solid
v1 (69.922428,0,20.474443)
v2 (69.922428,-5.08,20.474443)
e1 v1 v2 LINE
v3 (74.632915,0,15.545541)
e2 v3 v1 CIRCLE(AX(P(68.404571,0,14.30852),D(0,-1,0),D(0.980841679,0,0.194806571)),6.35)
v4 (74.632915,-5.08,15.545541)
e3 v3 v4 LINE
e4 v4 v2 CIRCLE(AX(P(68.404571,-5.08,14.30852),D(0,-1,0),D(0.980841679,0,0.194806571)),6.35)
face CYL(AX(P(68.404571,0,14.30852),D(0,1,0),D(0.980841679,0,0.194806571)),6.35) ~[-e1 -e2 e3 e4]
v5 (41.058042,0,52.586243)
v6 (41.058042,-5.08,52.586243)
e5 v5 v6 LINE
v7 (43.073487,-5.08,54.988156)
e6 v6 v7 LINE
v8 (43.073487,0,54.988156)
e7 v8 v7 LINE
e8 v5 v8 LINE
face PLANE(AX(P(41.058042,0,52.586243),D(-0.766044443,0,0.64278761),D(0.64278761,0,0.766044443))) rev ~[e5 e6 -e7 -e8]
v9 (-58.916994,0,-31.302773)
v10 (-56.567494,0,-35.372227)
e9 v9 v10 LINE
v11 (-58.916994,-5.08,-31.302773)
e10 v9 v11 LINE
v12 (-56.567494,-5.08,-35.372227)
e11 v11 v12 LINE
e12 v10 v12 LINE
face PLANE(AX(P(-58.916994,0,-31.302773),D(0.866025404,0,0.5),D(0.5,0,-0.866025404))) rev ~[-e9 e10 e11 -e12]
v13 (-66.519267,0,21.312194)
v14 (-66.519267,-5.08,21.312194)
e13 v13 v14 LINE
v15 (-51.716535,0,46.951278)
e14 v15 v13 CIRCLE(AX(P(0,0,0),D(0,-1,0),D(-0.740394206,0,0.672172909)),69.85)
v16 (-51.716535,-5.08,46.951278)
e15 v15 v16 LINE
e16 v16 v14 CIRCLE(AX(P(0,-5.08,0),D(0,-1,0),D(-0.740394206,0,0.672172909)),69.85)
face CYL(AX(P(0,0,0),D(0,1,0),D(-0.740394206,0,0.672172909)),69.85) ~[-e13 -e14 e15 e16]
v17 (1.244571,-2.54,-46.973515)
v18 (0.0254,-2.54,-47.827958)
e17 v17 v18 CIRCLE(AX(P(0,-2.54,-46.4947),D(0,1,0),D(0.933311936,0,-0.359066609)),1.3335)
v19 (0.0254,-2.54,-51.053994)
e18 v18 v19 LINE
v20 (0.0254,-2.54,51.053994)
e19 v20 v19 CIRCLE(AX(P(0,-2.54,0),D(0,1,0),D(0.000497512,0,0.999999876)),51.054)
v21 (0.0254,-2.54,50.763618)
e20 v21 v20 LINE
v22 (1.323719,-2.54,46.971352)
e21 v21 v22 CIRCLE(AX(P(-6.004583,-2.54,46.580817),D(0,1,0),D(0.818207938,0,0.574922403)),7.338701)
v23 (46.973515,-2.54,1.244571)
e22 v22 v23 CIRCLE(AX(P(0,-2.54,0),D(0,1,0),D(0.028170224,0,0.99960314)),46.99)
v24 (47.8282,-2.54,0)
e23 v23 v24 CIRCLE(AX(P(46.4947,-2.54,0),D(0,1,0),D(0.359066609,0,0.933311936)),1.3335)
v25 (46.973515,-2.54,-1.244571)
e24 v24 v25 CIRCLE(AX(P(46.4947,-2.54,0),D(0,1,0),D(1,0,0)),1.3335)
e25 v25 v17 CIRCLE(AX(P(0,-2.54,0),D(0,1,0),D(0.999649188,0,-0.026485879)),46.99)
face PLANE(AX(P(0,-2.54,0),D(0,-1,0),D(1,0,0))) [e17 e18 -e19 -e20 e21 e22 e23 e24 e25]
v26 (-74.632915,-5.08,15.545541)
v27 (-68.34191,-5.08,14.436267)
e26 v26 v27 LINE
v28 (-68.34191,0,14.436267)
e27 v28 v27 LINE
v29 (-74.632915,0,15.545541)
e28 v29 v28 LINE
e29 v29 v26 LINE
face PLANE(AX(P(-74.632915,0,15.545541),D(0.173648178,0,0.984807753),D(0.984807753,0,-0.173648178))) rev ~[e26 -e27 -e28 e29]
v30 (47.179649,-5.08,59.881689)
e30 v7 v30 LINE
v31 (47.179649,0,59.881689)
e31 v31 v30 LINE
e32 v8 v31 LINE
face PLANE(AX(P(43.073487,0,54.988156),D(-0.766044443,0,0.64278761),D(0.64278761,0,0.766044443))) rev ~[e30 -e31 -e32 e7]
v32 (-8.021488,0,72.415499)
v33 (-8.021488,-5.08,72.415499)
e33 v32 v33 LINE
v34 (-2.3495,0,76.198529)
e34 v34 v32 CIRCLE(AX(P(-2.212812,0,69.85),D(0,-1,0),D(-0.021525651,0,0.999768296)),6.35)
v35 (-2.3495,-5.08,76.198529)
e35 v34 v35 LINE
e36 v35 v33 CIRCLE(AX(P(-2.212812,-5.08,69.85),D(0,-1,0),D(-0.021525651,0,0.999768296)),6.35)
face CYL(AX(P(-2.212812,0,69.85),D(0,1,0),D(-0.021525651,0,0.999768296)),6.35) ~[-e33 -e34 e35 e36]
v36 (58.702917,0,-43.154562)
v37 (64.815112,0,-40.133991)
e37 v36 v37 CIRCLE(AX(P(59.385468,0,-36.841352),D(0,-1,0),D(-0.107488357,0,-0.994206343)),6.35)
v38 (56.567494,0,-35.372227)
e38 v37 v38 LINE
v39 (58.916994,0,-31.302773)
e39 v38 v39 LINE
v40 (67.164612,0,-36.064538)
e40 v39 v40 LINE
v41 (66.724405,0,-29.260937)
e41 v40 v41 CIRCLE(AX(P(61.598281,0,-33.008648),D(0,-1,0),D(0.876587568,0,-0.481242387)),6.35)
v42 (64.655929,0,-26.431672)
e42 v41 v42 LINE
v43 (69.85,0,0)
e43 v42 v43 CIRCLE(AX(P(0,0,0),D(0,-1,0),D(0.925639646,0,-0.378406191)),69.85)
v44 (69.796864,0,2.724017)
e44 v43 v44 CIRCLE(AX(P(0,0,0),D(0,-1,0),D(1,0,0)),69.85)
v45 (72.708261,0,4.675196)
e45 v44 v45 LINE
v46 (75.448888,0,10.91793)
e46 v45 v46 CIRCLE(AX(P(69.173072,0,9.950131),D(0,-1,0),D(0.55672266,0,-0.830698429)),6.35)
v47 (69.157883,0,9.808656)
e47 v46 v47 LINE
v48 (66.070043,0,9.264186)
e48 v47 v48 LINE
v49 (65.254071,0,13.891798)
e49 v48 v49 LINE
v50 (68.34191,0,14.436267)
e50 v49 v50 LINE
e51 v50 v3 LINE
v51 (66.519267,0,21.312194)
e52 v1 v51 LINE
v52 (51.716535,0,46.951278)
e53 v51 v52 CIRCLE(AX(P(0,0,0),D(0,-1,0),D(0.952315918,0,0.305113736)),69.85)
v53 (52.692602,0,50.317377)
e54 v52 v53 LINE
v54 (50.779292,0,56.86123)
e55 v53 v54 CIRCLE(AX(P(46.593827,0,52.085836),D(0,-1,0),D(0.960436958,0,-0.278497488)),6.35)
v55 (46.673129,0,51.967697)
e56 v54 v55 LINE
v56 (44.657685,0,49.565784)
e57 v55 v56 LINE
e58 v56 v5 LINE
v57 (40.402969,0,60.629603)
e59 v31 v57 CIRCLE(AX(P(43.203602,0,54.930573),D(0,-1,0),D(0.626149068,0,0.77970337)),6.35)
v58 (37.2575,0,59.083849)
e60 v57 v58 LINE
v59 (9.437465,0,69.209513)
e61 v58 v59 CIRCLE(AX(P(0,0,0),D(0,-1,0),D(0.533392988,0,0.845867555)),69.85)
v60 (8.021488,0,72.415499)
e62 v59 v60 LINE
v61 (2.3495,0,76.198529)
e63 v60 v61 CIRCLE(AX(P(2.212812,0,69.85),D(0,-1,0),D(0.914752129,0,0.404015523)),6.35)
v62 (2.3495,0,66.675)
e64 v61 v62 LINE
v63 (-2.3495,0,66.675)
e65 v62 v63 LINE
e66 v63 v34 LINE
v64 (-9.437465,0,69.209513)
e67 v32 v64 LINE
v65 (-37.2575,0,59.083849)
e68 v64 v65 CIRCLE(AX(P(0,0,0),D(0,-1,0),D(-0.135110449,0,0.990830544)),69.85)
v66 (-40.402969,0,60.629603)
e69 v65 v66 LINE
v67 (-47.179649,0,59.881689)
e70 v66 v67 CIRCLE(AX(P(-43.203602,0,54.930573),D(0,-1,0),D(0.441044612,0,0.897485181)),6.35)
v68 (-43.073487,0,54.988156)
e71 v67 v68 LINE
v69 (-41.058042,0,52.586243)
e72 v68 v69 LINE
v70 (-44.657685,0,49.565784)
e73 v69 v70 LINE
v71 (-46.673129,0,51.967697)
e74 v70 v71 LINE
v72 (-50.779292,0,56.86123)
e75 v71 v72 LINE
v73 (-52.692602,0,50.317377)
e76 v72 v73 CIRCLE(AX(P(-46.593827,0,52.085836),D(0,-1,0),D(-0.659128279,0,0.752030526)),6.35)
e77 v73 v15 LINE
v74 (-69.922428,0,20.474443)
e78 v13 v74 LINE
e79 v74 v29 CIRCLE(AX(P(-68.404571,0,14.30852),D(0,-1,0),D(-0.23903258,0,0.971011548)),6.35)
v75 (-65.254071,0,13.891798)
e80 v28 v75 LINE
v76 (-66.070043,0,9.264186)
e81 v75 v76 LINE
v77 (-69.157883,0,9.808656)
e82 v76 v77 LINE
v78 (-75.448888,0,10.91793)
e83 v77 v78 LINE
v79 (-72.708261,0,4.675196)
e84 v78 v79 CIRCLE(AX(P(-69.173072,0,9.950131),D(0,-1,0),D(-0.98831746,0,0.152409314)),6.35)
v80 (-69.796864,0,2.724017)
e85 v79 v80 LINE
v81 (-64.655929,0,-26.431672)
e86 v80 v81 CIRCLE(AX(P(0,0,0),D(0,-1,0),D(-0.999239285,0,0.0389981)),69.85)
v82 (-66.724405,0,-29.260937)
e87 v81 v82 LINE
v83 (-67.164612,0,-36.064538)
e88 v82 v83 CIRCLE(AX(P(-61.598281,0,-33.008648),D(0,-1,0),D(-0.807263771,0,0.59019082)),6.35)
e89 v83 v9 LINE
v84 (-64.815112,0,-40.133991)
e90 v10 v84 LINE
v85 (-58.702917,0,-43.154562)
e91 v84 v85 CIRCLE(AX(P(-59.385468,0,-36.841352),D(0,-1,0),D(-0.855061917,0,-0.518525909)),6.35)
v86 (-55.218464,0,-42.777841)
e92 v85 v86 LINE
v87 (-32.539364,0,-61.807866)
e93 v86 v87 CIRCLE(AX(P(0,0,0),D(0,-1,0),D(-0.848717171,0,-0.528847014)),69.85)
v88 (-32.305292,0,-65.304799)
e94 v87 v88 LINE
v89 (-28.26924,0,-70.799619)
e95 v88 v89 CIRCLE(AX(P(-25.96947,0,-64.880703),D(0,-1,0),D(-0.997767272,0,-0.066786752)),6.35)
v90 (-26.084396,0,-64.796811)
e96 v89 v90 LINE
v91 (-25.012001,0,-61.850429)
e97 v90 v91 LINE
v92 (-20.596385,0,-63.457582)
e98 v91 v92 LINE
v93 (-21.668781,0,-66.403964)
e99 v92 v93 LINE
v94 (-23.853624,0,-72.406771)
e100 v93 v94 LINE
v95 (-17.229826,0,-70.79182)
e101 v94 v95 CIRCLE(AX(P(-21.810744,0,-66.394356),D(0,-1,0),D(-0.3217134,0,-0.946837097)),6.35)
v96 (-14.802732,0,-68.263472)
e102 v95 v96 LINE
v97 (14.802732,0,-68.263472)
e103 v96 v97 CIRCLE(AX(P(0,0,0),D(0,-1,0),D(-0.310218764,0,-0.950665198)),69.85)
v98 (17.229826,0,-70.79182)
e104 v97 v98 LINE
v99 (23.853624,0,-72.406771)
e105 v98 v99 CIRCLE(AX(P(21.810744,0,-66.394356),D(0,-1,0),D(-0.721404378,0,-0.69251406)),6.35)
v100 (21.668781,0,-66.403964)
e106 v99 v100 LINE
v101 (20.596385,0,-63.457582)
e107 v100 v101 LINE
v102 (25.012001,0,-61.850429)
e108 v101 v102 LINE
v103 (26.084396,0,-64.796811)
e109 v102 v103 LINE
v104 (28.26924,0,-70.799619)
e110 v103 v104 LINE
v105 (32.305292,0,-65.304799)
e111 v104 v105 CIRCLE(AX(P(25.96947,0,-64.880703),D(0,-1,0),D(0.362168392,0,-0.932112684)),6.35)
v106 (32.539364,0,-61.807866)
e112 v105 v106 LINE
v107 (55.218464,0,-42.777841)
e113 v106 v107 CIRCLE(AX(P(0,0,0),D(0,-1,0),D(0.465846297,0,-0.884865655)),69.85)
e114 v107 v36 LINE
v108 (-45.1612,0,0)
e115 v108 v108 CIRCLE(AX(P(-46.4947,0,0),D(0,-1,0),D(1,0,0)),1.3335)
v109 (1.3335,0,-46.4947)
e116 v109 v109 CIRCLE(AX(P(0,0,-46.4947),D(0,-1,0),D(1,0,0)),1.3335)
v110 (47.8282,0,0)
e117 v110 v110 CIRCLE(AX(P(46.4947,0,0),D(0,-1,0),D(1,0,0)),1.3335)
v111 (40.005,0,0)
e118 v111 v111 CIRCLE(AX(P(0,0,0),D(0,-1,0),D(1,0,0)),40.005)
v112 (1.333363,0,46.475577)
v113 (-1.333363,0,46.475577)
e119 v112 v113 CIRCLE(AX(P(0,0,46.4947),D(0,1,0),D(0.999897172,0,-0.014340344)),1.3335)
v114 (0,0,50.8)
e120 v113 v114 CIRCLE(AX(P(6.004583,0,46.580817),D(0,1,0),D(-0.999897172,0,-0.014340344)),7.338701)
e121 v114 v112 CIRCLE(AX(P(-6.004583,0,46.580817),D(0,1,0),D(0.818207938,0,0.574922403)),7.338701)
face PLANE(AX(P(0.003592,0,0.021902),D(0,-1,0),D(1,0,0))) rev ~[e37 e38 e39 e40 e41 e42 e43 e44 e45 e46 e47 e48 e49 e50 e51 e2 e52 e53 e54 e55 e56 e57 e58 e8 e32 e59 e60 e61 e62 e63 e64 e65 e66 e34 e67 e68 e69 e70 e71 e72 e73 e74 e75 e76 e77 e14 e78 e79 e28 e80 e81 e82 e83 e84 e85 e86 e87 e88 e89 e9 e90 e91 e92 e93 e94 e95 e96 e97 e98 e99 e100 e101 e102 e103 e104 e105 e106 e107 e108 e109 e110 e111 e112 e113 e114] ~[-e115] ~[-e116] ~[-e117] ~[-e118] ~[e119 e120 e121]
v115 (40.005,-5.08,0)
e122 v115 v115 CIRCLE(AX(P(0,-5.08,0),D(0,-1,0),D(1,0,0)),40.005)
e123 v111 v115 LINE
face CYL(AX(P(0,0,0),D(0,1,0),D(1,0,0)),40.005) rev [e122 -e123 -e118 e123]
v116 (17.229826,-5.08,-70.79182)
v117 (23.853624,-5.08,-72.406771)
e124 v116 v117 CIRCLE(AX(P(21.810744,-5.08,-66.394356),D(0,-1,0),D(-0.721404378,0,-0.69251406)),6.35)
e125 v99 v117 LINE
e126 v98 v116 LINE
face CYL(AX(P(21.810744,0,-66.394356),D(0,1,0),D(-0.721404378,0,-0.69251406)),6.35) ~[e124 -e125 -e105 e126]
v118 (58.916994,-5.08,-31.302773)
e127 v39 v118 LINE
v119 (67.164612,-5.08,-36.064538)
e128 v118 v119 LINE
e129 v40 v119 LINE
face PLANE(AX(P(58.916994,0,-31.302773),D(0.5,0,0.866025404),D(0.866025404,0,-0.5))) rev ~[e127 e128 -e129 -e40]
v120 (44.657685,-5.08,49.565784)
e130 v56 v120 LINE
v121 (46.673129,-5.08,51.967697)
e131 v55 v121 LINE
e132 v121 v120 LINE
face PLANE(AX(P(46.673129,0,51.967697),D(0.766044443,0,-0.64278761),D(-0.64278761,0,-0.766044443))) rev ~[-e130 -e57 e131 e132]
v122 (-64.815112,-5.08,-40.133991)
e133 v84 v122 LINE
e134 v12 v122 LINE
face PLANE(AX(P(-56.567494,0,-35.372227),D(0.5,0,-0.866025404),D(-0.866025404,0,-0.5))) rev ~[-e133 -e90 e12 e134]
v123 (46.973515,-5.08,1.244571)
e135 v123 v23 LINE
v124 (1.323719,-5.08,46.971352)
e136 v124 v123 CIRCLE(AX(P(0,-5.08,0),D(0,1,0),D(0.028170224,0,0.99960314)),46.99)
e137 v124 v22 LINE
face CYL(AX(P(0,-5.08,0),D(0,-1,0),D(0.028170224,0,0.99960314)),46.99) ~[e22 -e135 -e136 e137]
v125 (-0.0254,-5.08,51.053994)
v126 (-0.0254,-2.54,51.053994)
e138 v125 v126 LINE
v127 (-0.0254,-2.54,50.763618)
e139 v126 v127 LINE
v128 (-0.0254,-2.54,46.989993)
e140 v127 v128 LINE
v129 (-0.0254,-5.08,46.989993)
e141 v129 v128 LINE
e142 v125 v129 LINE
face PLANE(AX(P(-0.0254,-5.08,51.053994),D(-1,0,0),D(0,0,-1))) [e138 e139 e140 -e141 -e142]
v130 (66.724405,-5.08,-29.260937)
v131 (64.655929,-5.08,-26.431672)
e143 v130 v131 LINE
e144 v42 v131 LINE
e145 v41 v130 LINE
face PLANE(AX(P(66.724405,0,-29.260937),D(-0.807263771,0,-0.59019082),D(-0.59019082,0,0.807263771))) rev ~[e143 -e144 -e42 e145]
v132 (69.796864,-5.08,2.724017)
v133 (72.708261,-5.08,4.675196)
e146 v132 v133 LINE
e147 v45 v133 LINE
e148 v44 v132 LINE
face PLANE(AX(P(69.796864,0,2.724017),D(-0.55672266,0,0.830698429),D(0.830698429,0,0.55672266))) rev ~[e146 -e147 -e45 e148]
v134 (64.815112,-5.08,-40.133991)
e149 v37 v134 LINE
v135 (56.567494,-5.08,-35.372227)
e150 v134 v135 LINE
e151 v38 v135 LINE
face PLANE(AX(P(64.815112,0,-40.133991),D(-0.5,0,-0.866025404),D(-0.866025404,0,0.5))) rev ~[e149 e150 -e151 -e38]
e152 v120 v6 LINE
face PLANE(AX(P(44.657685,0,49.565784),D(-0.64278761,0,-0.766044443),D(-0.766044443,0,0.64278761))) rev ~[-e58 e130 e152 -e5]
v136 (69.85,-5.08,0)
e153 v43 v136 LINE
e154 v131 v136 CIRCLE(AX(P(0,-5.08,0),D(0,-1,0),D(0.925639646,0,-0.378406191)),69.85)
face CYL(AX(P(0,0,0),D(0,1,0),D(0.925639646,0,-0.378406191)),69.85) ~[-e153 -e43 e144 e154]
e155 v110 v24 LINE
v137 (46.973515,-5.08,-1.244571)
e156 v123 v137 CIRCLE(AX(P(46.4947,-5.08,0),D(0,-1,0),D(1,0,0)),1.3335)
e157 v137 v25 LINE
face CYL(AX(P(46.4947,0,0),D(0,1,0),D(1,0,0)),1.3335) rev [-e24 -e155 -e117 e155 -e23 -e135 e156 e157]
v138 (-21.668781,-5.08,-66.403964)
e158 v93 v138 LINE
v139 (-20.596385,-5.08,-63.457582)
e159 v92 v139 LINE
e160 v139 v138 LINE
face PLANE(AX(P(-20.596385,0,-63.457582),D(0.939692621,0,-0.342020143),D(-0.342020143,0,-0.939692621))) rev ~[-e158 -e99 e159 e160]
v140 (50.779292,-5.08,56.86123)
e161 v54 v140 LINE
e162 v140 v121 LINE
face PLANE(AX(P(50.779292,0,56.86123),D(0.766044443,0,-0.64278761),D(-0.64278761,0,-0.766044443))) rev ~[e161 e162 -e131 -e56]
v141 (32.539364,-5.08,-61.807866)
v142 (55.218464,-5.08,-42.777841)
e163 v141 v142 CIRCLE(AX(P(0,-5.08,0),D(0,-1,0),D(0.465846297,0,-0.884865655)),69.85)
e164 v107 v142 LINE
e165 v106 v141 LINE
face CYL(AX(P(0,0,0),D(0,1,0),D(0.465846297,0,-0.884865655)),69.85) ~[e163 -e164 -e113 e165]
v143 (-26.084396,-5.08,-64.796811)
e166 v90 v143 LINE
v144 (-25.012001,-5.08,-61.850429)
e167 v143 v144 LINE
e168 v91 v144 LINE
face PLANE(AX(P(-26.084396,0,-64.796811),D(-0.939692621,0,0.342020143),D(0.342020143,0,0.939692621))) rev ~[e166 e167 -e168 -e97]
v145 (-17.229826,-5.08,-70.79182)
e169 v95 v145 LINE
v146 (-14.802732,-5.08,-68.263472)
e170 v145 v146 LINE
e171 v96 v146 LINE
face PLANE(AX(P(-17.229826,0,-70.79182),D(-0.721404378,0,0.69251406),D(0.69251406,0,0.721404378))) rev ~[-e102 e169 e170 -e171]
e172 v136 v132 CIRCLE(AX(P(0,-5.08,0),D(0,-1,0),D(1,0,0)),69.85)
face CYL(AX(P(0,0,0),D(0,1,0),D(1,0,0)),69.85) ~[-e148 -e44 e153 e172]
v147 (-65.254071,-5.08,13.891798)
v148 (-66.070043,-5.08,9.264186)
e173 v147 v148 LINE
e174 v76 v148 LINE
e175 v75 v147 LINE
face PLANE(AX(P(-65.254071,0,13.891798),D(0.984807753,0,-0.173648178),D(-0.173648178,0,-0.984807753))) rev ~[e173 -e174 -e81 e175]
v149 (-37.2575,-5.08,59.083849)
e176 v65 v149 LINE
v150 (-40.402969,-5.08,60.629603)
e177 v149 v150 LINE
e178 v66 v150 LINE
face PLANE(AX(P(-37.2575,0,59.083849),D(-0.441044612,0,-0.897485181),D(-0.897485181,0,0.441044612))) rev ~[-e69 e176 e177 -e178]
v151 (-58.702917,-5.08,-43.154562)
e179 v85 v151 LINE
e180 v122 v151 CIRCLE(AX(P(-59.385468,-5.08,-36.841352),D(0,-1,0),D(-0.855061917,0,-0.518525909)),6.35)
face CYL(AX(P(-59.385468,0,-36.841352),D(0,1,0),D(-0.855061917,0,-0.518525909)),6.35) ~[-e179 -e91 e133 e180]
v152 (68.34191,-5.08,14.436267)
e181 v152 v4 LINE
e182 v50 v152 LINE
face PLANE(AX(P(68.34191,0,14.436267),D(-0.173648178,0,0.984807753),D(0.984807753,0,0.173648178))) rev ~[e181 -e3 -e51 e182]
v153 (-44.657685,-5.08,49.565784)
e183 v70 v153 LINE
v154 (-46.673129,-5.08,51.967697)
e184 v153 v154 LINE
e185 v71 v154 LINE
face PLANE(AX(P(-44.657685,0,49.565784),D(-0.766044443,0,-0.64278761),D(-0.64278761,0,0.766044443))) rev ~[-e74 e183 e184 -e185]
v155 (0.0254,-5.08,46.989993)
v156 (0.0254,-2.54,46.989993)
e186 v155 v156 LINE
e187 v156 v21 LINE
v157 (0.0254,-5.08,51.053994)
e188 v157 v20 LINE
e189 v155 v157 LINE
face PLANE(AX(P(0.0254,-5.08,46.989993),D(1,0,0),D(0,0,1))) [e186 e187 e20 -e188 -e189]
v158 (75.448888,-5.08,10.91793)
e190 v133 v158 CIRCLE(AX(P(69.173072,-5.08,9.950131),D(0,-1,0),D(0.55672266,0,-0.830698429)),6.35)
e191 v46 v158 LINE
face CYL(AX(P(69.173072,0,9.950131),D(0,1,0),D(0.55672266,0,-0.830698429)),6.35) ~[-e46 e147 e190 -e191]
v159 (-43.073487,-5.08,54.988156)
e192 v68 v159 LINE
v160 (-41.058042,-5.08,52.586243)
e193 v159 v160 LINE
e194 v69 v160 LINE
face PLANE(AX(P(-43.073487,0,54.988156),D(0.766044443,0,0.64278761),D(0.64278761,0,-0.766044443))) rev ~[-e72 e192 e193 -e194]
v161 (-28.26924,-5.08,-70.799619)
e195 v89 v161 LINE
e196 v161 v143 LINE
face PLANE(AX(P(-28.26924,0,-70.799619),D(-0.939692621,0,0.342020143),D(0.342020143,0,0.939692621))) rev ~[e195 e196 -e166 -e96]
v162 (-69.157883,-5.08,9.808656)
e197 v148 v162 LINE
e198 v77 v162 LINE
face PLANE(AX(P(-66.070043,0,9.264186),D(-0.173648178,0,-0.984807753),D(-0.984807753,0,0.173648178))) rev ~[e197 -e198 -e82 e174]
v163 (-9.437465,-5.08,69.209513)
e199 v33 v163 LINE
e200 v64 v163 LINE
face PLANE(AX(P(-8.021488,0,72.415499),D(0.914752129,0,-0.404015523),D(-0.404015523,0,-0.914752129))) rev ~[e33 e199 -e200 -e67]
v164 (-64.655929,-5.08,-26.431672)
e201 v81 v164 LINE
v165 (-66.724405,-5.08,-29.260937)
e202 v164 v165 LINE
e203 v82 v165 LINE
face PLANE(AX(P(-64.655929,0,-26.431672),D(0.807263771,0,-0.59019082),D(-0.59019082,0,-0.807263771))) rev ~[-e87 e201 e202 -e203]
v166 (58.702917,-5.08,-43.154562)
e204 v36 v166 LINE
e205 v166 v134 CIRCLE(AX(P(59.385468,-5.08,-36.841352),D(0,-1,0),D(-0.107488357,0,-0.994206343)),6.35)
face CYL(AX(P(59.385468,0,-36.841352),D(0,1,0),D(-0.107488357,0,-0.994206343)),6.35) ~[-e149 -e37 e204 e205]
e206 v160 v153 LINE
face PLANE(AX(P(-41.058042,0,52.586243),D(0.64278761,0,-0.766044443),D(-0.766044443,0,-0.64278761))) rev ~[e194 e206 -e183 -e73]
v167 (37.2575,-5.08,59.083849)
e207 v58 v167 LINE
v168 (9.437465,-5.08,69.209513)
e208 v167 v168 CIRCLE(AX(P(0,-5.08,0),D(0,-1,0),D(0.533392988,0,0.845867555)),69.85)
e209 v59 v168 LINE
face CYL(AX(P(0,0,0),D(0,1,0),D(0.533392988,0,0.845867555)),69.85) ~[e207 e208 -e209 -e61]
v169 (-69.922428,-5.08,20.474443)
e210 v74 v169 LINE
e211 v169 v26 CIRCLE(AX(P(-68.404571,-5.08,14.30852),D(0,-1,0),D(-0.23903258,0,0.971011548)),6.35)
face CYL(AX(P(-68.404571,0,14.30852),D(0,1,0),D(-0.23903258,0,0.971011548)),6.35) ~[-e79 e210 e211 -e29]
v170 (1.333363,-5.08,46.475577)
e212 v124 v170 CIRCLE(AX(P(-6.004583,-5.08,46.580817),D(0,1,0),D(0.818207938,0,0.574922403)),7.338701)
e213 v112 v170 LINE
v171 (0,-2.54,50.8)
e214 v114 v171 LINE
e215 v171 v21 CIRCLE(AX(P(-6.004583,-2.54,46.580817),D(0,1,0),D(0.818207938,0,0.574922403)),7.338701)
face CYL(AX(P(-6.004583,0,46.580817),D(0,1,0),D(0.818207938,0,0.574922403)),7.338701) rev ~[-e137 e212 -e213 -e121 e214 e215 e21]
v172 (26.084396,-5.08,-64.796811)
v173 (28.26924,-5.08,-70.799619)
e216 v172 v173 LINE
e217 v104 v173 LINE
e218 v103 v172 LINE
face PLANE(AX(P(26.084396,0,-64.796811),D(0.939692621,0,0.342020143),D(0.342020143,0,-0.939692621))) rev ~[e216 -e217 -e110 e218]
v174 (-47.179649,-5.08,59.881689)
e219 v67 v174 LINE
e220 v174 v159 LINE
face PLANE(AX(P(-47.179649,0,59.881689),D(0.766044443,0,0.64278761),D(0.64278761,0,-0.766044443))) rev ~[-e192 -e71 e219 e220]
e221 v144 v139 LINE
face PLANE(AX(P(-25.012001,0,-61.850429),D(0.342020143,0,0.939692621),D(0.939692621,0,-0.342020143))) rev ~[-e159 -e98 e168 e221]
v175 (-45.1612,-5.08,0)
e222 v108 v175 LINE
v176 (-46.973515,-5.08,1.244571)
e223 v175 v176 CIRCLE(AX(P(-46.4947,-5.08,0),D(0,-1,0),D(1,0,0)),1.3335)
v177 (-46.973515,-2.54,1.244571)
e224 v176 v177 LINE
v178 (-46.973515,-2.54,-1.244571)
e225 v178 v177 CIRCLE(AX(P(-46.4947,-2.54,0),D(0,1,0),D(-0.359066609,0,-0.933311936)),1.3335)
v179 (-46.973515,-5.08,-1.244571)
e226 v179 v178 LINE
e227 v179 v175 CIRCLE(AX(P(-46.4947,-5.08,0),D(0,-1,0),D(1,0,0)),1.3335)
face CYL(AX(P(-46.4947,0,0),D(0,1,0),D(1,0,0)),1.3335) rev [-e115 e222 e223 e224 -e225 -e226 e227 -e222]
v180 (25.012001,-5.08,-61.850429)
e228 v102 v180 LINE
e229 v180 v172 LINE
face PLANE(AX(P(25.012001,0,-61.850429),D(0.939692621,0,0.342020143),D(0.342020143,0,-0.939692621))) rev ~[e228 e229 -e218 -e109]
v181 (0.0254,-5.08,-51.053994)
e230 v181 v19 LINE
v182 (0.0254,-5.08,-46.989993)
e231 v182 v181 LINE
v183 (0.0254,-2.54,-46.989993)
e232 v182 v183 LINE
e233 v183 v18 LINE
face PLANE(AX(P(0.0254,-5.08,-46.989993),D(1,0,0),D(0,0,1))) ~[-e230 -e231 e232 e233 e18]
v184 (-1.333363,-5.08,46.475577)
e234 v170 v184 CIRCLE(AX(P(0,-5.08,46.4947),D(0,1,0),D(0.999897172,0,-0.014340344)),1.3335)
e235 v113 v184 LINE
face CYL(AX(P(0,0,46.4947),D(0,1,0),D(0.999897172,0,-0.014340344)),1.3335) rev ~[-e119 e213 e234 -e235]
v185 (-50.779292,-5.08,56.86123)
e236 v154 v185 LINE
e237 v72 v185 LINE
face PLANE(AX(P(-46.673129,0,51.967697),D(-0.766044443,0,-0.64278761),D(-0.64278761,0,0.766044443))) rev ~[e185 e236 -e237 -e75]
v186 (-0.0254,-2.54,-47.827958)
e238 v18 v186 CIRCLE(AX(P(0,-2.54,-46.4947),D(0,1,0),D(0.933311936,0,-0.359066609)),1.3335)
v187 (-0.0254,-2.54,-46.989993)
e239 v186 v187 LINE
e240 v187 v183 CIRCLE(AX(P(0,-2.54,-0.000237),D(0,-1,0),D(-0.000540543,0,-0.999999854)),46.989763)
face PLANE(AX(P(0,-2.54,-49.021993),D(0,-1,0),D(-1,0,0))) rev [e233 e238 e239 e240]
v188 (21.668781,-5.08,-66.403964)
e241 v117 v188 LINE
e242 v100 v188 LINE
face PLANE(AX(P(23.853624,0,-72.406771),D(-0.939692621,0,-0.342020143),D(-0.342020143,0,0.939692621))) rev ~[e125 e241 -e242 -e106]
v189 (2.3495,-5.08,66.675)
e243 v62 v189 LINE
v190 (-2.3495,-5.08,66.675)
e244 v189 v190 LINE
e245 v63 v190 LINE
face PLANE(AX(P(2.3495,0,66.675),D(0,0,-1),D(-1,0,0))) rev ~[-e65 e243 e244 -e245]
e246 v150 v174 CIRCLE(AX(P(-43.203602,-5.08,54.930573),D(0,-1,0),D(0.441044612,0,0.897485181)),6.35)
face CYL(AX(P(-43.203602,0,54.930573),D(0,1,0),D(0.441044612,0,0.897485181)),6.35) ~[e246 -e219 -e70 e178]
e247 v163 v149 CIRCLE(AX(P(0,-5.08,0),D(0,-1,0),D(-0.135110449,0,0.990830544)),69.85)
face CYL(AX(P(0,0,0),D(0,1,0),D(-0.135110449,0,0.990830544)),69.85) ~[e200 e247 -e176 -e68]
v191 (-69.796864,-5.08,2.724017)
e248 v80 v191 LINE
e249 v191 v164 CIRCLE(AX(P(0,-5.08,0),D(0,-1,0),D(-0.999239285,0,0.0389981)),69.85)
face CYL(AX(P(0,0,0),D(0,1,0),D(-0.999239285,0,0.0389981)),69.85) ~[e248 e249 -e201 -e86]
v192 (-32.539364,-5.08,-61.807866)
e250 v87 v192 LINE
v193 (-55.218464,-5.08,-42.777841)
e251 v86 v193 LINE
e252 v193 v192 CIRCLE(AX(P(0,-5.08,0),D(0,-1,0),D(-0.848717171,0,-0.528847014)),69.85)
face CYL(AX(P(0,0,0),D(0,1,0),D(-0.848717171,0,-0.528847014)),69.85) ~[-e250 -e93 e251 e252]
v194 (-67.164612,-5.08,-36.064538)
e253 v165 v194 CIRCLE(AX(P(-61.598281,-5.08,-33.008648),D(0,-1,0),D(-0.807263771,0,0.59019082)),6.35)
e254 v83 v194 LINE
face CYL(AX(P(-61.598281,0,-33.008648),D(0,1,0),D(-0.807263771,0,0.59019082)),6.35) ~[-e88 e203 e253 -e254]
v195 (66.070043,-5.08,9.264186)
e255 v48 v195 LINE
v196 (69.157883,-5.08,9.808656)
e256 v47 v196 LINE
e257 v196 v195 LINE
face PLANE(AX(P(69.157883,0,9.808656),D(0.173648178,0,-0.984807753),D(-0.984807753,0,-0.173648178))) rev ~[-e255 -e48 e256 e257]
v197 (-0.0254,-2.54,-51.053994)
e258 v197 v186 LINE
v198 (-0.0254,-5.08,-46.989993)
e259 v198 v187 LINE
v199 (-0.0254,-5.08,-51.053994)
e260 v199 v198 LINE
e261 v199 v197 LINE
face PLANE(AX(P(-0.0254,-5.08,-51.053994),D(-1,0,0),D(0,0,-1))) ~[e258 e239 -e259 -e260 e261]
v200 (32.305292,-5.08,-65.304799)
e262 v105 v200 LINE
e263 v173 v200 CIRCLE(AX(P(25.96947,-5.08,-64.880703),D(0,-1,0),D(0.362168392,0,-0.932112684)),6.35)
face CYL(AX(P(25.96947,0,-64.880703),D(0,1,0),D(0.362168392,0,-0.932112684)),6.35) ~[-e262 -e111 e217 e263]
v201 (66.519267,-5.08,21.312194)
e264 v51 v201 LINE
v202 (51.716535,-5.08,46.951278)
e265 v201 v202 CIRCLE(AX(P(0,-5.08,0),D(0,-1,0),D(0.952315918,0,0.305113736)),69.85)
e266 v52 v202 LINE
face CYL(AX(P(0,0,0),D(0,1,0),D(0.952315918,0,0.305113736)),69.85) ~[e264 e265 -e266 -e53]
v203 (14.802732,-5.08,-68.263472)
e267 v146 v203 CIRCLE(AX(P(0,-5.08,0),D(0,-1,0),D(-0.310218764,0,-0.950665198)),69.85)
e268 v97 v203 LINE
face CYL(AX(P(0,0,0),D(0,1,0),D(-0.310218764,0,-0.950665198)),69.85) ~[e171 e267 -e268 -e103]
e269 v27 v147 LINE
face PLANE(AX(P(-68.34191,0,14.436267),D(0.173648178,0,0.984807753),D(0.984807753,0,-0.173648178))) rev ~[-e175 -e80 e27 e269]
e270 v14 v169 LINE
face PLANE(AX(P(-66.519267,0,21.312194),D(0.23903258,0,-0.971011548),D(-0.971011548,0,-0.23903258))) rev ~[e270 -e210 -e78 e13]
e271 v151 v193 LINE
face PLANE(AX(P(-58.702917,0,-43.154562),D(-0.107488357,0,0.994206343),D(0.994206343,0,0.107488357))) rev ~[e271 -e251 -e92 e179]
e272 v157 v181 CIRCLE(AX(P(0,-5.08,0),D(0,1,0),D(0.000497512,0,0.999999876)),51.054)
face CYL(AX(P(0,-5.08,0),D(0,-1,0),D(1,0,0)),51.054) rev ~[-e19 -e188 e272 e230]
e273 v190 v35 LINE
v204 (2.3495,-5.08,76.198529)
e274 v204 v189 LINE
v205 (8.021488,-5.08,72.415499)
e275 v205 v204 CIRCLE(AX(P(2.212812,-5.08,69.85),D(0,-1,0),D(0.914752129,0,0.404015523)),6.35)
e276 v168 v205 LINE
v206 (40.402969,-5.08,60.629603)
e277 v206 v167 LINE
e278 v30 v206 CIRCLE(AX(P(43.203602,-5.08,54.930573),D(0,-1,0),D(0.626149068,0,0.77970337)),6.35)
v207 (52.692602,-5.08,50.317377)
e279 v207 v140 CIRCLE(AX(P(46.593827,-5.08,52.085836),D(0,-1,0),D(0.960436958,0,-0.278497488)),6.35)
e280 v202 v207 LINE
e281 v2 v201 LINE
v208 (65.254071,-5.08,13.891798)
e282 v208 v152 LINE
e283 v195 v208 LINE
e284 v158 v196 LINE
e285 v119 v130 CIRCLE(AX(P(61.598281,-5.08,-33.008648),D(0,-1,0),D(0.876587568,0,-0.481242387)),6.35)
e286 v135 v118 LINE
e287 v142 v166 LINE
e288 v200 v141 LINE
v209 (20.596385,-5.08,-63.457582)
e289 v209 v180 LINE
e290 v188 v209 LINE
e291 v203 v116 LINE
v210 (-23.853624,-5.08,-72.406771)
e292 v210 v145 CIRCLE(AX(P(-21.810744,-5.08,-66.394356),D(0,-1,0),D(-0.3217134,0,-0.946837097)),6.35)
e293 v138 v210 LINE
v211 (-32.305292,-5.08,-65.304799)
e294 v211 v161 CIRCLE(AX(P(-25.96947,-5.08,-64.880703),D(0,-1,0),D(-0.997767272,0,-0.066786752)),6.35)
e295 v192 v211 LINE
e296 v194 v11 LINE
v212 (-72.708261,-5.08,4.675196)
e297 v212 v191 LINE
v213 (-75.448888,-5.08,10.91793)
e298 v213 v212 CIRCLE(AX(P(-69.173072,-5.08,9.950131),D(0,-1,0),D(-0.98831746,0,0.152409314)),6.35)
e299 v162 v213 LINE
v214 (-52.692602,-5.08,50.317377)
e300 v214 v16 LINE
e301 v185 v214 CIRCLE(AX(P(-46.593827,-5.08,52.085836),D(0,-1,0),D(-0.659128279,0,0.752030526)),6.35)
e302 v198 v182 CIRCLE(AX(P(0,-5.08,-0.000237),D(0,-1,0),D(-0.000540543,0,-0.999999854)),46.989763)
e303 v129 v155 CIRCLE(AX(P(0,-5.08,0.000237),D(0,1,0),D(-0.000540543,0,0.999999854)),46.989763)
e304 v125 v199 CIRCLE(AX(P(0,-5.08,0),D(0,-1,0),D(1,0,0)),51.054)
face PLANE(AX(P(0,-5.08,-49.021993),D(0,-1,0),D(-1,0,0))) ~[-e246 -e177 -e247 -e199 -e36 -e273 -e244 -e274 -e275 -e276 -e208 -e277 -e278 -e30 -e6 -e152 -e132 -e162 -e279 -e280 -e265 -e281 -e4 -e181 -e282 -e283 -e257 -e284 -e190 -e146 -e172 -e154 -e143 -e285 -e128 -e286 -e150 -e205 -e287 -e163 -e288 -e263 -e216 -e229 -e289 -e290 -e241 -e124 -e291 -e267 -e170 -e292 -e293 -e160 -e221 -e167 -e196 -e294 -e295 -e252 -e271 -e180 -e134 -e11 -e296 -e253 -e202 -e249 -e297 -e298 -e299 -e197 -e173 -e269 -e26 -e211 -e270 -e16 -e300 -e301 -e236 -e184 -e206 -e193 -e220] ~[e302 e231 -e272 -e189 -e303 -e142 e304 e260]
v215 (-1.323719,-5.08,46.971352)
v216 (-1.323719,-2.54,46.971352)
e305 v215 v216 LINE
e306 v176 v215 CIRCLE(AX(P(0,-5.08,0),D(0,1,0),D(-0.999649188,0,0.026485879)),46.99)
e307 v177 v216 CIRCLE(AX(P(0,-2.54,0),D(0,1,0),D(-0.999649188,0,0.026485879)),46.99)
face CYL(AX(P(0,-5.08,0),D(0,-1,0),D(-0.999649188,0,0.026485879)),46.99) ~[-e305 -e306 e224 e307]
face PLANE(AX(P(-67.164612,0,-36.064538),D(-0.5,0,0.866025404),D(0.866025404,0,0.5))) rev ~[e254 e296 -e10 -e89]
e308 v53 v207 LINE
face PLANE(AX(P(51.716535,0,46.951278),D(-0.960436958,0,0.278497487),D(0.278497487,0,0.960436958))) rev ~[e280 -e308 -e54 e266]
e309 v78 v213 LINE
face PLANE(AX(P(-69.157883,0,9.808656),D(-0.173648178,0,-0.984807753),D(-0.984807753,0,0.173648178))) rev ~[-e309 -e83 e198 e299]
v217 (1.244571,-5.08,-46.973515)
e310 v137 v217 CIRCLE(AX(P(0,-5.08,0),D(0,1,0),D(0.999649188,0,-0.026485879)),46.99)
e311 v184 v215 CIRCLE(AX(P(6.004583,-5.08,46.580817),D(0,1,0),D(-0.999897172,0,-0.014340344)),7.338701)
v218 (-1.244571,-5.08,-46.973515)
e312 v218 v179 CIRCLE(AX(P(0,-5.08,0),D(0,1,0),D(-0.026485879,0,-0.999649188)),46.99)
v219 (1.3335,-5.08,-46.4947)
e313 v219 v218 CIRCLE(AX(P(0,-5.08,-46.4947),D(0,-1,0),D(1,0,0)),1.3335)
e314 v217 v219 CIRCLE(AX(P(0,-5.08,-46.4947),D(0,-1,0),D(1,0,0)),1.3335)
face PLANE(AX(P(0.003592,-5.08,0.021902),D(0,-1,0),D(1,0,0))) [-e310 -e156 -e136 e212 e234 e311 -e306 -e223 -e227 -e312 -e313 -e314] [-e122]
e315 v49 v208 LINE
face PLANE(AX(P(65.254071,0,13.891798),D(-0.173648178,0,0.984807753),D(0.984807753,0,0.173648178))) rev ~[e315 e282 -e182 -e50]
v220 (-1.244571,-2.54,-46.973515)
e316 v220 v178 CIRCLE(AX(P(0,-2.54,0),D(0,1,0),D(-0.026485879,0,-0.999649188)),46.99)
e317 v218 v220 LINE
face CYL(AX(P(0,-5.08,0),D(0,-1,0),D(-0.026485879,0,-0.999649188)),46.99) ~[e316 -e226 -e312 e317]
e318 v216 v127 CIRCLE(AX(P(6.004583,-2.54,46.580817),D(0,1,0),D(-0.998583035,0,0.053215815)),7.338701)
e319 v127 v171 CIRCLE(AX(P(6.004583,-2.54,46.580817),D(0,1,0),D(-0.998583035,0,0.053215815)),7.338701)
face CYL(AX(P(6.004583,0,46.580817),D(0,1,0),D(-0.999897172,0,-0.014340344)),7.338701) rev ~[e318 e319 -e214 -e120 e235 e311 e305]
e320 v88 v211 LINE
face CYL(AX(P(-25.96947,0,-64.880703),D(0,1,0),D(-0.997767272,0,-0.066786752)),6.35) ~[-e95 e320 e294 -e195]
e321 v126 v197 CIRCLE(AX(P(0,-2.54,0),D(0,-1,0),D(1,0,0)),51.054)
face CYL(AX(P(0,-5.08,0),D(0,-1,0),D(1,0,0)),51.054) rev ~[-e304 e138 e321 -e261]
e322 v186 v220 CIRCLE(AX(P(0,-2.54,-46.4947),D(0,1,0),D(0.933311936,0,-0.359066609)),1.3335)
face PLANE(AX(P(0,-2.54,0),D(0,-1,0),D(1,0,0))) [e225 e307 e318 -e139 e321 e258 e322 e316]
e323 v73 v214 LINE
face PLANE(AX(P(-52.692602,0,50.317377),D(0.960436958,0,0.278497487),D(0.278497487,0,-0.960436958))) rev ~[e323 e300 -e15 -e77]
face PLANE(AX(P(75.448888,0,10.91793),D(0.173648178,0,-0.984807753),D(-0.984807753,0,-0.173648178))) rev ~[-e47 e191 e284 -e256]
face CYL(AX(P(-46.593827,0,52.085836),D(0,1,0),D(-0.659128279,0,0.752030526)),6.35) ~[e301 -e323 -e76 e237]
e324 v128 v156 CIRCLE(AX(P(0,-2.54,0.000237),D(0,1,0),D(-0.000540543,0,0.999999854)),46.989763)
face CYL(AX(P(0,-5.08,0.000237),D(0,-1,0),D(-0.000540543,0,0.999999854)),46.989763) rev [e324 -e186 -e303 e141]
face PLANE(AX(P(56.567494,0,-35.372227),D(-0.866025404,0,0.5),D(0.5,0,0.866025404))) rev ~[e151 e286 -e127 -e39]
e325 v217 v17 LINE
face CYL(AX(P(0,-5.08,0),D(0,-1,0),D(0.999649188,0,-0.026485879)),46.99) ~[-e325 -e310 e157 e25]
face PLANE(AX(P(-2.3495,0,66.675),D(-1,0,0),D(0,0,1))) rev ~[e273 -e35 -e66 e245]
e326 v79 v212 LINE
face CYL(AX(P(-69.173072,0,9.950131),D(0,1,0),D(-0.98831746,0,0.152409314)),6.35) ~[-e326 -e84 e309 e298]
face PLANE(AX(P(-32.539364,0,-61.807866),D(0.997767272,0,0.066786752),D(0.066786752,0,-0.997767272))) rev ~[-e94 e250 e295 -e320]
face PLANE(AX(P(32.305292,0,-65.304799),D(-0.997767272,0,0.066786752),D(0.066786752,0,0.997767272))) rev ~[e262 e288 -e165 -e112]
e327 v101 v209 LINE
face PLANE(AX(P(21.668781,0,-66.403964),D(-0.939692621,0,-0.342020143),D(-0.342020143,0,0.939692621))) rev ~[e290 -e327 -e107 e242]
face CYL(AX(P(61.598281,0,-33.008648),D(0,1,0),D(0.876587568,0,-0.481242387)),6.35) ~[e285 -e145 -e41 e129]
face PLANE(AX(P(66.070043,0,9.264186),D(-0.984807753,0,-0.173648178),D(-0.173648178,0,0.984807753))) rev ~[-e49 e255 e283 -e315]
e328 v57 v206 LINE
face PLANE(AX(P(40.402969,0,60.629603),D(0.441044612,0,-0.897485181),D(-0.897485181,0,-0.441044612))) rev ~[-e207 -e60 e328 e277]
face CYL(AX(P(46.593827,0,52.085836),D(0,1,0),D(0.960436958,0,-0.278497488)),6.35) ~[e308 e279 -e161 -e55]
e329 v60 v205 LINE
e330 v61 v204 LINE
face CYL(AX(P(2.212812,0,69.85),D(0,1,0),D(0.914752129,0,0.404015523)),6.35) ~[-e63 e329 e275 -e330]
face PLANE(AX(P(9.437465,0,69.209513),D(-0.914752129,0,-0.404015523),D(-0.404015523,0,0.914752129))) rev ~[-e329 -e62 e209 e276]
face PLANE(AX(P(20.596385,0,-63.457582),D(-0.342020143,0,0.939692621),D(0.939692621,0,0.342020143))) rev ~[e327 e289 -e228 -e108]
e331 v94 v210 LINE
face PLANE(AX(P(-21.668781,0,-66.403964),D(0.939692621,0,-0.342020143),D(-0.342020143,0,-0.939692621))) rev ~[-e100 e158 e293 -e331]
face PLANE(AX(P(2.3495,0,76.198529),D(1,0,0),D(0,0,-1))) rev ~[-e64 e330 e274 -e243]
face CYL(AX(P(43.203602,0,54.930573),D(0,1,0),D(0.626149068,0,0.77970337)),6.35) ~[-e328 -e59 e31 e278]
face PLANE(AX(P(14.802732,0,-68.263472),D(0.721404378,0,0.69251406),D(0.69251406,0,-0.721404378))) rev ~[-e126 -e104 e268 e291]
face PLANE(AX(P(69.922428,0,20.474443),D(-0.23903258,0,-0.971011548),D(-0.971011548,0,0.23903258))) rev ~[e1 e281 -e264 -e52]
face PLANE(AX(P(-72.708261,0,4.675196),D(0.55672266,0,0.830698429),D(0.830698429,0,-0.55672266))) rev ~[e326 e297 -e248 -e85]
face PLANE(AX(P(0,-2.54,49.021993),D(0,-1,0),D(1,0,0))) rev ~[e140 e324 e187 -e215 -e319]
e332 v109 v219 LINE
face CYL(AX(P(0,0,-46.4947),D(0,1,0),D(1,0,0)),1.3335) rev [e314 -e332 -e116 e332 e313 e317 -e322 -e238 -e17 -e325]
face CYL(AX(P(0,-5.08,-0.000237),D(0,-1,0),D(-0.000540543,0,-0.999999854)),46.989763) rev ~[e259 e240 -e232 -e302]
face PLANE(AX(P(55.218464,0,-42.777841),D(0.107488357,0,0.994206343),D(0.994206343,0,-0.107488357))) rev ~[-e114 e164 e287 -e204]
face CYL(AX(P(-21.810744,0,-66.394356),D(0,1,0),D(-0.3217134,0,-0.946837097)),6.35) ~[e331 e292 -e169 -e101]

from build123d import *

# Parameters (mm, degrees)
F0_R     = 1.3335
F0_R_2   = 40.005
F1_DEPTH = 5.08
F2_R     = 51.054
F3_DEPTH = 2.54
F5_DEPTH = 2.54


# Not quite as in the source:
# - a pattern or mirror of a feature is missing from the dataset's text; its kind, count and spacing are read off the source's solid


with BuildPart() as f1:
    # F0 (on Front) → F1 (new body)
    with BuildSketch(Plane.XZ):
        with BuildLine():
            ThreePointArc((64.6559292996, -26.4316724103), (68.5391828138, -13.4685900974), (69.85, 0))
            ThreePointArc((69.85, 0), (69.8367147463, 1.3622677557), (69.796864039, 2.7240173131))
            ThreePointArc((69.796864039, 2.7240173131), (69.5676178372, 6.2744759504), (69.1578829213, 9.8086558631))
            Line((69.1578829213, 9.8086558631), (66.0700433255, 9.2641864302))
            Line((66.0700433255, 9.2641864302), (65.2540705387, 13.8917980616))
            Line((65.2540705387, 13.8917980616), (68.3419101345, 14.4362674945))
            ThreePointArc((68.3419101345, 14.4362674945), (67.5181742912, 17.8974478736), (66.5192668833, 21.3121944743))
            ThreePointArc((66.5192668833, 21.3121944743), (60.4918744543, 34.925), (51.7165352668, 46.9512777249))
            ThreePointArc((51.7165352668, 46.9512777249), (49.258731667, 49.5237302165), (46.6731294533, 51.9676965724))
            Line((46.6731294533, 51.9676965724), (44.657685295, 49.565783756))
            Line((44.657685295, 49.565783756), (41.0580424567, 52.5862427339))
            Line((41.0580424567, 52.5862427339), (43.0734866151, 54.9881555503))
            ThreePointArc((43.0734866151, 54.9881555503), (40.2176644871, 57.1100863526), (37.257500213, 59.0838487057))
            ThreePointArc((37.257500213, 59.0838487057), (23.8901070113, 65.6375295619), (9.4374648779, 69.2095134839))
            ThreePointArc((9.4374648779, 69.2095134839), (5.9011375, 69.6002807193), (2.3495, 69.8104744988))
            Line((2.3495, 69.8104744988), (2.3495, 66.675))
            Line((2.3495, 66.675), (-2.3495, 66.675))
            Line((-2.3495, 66.675), (-2.3495, 69.8104744988))
            ThreePointArc((-2.3495, 69.8104744988), (-5.9011375, 69.6002807193), (-9.4374648779, 69.2095134839))
            ThreePointArc((-9.4374648779, 69.2095134839), (-23.8901070113, 65.6375295619), (-37.257500213, 59.0838487057))
            ThreePointArc((-37.257500213, 59.0838487057), (-40.2176644871, 57.1100863526), (-43.0734866151, 54.9881555503))
            Line((-43.0734866151, 54.9881555503), (-41.0580424567, 52.5862427339))
            Line((-41.0580424567, 52.5862427339), (-44.657685295, 49.565783756))
            Line((-44.657685295, 49.565783756), (-46.6731294533, 51.9676965724))
            ThreePointArc((-46.6731294533, 51.9676965724), (-49.258731667, 49.5237302165), (-51.7165352668, 46.9512777249))
            ThreePointArc((-51.7165352668, 46.9512777249), (-60.4918744543, 34.925), (-66.5192668833, 21.3121944743))
            ThreePointArc((-66.5192668833, 21.3121944743), (-67.5181742912, 17.8974478736), (-68.3419101345, 14.4362674945))
            Line((-68.3419101345, 14.4362674945), (-65.2540705387, 13.8917980616))
            Line((-65.2540705387, 13.8917980616), (-66.0700433255, 9.2641864302))
            Line((-66.0700433255, 9.2641864302), (-69.1578829213, 9.8086558631))
            ThreePointArc((-69.1578829213, 9.8086558631), (-69.5676178372, 6.2744759504), (-69.796864039, 2.7240173131))
            ThreePointArc((-69.796864039, 2.7240173131), (-68.7888215479, -12.12932521), (-64.6559292996, -26.4316724103))
            ThreePointArc((-64.6559292996, -26.4316724103), (-63.2261799634, -29.6896053734), (-61.6323943662, -32.8705105632))
            Line((-61.6323943662, -32.8705105632), (-58.9169937973, -31.3027733138))
            Line((-58.9169937973, -31.3027733138), (-56.5674937973, -35.3722266862))
            Line((-56.5674937973, -35.3722266862), (-59.2828943662, -36.9399639356))
            ThreePointArc((-59.2828943662, -36.9399639356), (-57.3250424634, -39.9106753459), (-55.2184644216, -42.7778410736))
            ThreePointArc((-55.2184644216, -42.7778410736), (-44.8987145366, -53.5082043519), (-32.539363826, -61.8078660188))
            ThreePointArc((-32.539363826, -61.8078660188), (-29.3499533501, -63.384562303), (-26.0843963063, -64.7968114134))
            Line((-26.0843963063, -64.7968114134), (-25.0120008688, -61.8504291642))
            Line((-25.0120008688, -61.8504291642), (-20.5963852437, -63.4575818176))
            Line((-20.5963852437, -63.4575818176), (-21.6687806812, -66.4039640668))
            ThreePointArc((-21.6687806812, -66.4039640668), (-18.2594426241, -67.4211780901), (-14.8027316165, -68.2634721992))
            ThreePointArc((-14.8027316165, -68.2634721992), (0, -69.85), (14.8027316165, -68.2634721992))
            ThreePointArc((14.8027316165, -68.2634721992), (18.2594426241, -67.4211780901), (21.6687806812, -66.4039640668))
            Line((21.6687806812, -66.4039640668), (20.5963852437, -63.4575818176))
            Line((20.5963852437, -63.4575818176), (25.0120008688, -61.8504291642))
            Line((25.0120008688, -61.8504291642), (26.0843963063, -64.7968114134))
            ThreePointArc((26.0843963063, -64.7968114134), (29.3499533501, -63.384562303), (32.539363826, -61.8078660188))
            ThreePointArc((32.539363826, -61.8078660188), (44.8987145366, -53.5082043519), (55.2184644216, -42.7778410736))
            ThreePointArc((55.2184644216, -42.7778410736), (57.3250424634, -39.9106753459), (59.2828943662, -36.9399639356))
            Line((59.2828943662, -36.9399639356), (56.5674937973, -35.3722266862))
            Line((56.5674937973, -35.3722266862), (58.9169937973, -31.3027733138))
            Line((58.9169937973, -31.3027733138), (61.6323943662, -32.8705105632))
            ThreePointArc((61.6323943662, -32.8705105632), (63.2261799634, -29.6896053734), (64.6559292996, -26.4316724103))
        make_face()
        with Locations((-46.4947, 0)):
            Circle(F0_R, mode=Mode.SUBTRACT)
        with Locations((0, -46.4947)):
            Circle(F0_R, mode=Mode.SUBTRACT)
        Circle(F0_R_2, mode=Mode.SUBTRACT)
        with Locations((46.4947, 0)):
            Circle(F0_R, mode=Mode.SUBTRACT)
        with BuildLine():
            ThreePointArc((1.3333628788, 46.4755771511), (0, 45.1612), (-1.3333628788, 46.4755771511))
            ThreePointArc((-1.3333628788, 46.4755771511), (-1.0083284803, 48.7431296807), (0, 50.8))
            ThreePointArc((0, 50.8), (1.0083284803, 48.7431296807), (1.3333628788, 46.4755771511))
        make_face(mode=Mode.SUBTRACT)
        with BuildLine():
            ThreePointArc((-43.0734866151, 54.9881555503), (-40.2176644871, 57.1100863526), (-37.257500213, 59.0838487057))
            Line((-37.257500213, 59.0838487057), (-40.4029688253, 60.6296034594))
            ThreePointArc((-40.4029688253, 60.6296034594), (-43.9001960603, 61.242248794), (-47.1796486938, 59.8816889594))
            Line((-47.1796486938, 59.8816889594), (-43.0734866151, 54.9881555503))
        make_face()
        with BuildLine():
            ThreePointArc((-51.7165352668, 46.9512777249), (-49.258731667, 49.5237302165), (-46.6731294533, 51.9676965724))
            Line((-46.6731294533, 51.9676965724), (-50.779291532, 56.8612299815))
            ThreePointArc((-50.779291532, 56.8612299815), (-52.6886523792, 53.8678583382), (-52.69260164, 50.3173770972))
            Line((-52.69260164, 50.3173770972), (-51.7165352668, 46.9512777249))
        make_face()
        with BuildLine():
            ThreePointArc((-9.4374648779, 69.2095134839), (-5.9011375, 69.6002807193), (-2.3495, 69.8104744988))
            Line((-2.3495, 69.8104744988), (-2.3495, 76.1985286816))
            ThreePointArc((-2.3495, 76.1985286816), (-5.7362574703, 75.1327864631), (-8.0214881298, 72.415498574))
            Line((-8.0214881298, 72.415498574), (-9.4374648779, 69.2095134839))
        make_face()
        with BuildLine():
            ThreePointArc((2.3495, 69.8104744988), (5.9011375, 69.6002807193), (9.4374648779, 69.2095134839))
            Line((9.4374648779, 69.2095134839), (8.0214881298, 72.415498574))
            ThreePointArc((8.0214881298, 72.415498574), (5.7362574703, 75.1327864631), (2.3495, 76.1985286816))
            Line((2.3495, 76.1985286816), (2.3495, 69.8104744988))
        make_face()
        with BuildLine():
            ThreePointArc((37.257500213, 59.0838487057), (40.2176644871, 57.1100863526), (43.0734866151, 54.9881555503))
            Line((43.0734866151, 54.9881555503), (47.1796486938, 59.8816889594))
            ThreePointArc((47.1796486938, 59.8816889594), (43.9001960603, 61.242248794), (40.4029688253, 60.6296034594))
            Line((40.4029688253, 60.6296034594), (37.257500213, 59.0838487057))
        make_face()
        with BuildLine():
            ThreePointArc((46.6731294533, 51.9676965724), (49.258731667, 49.5237302165), (51.7165352668, 46.9512777249))
            Line((51.7165352668, 46.9512777249), (52.69260164, 50.3173770972))
            ThreePointArc((52.69260164, 50.3173770972), (52.6886523792, 53.8678583382), (50.779291532, 56.8612299815))
            Line((50.779291532, 56.8612299815), (46.6731294533, 51.9676965724))
        make_face()
        with BuildLine():
            ThreePointArc((66.5192668833, 21.3121944743), (67.5181742912, 17.8974478736), (68.3419101345, 14.4362674945))
            Line((68.3419101345, 14.4362674945), (74.6329154204, 15.5455414622))
            ThreePointArc((74.6329154204, 15.5455414622), (72.9952599579, 18.6957822824), (69.922427638, 20.4744430631))
            Line((69.922427638, 20.4744430631), (66.5192668833, 21.3121944743))
        make_face()
        with BuildLine():
            ThreePointArc((69.1578829213, 9.8086558631), (69.5676178372, 6.2744759504), (69.796864039, 2.7240173131))
            Line((69.796864039, 2.7240173131), (72.7082612299, 4.6751956613))
            ThreePointArc((72.7082612299, 4.6751956613), (74.9874412706, 7.3975606223), (75.4488882072, 10.9179298308))
            Line((75.4488882072, 10.9179298308), (69.1578829213, 9.8086558631))
        make_face()
        with BuildLine():
            Line((66.7244054577, -29.2609367904), (64.6559292996, -26.4316724103))
            ThreePointArc((64.6559292996, -26.4316724103), (63.2261799634, -29.6896053734), (61.6323943662, -32.8705105632))
            Line((61.6323943662, -32.8705105632), (67.1646115693, -36.0645376546))
            ThreePointArc((67.1646115693, -36.0645376546), (67.9350304693, -32.5986485396), (66.7244054577, -29.2609367904))
        make_face()
        with BuildLine():
            Line((64.8151115693, -40.133991027), (59.2828943662, -36.9399639356))
            ThreePointArc((59.2828943662, -36.9399639356), (57.3250424634, -39.9106753459), (55.2184644216, -42.7778410736))
            Line((55.2184644216, -42.7778410736), (58.7029173279, -43.1545617836))
            ThreePointArc((58.7029173279, -43.1545617836), (62.198772999, -42.5341379235), (64.8151115693, -40.133991027))
        make_face()
        with BuildLine():
            Line((23.8536238884, -72.4067714436), (21.6687806812, -66.4039640668))
            ThreePointArc((21.6687806812, -66.4039640668), (18.2594426241, -67.4211780901), (14.8027316165, -68.2634721992))
            Line((14.8027316165, -68.2634721992), (17.229825998, -70.7918201604))
            ThreePointArc((17.229825998, -70.7918201604), (20.3066075788, -72.5636406206), (23.8536238884, -72.4067714436))
        make_face()
        with BuildLine():
            Line((32.3052924046, -65.3047991207), (32.539363826, -61.8078660188))
            ThreePointArc((32.539363826, -61.8078660188), (29.3499533501, -63.384562303), (26.0843963063, -64.7968114134))
            Line((26.0843963063, -64.7968114134), (28.2692395134, -70.7996187901))
            ThreePointArc((28.2692395134, -70.7996187901), (31.0872452104, -68.6398094163), (32.3052924046, -65.3047991207))
        make_face()
        with BuildLine():
            Line((-28.2692395134, -70.7996187901), (-26.0843963063, -64.7968114134))
            ThreePointArc((-26.0843963063, -64.7968114134), (-29.3499533501, -63.384562303), (-32.539363826, -61.8078660188))
            Line((-32.539363826, -61.8078660188), (-32.3052924046, -65.3047991207))
            ThreePointArc((-32.3052924046, -65.3047991207), (-31.0872452104, -68.6398094163), (-28.2692395134, -70.7996187901))
        make_face()
        with BuildLine():
            Line((-17.229825998, -70.7918201604), (-14.8027316165, -68.2634721992))
            ThreePointArc((-14.8027316165, -68.2634721992), (-18.2594426241, -67.4211780901), (-21.6687806812, -66.4039640668))
            Line((-21.6687806812, -66.4039640668), (-23.8536238884, -72.4067714436))
            ThreePointArc((-23.8536238884, -72.4067714436), (-20.3066075788, -72.5636406206), (-17.229825998, -70.7918201604))
        make_face()
        with BuildLine():
            Line((-58.7029173279, -43.1545617836), (-55.2184644216, -42.7778410736))
            ThreePointArc((-55.2184644216, -42.7778410736), (-57.3250424634, -39.9106753459), (-59.2828943662, -36.9399639356))
            Line((-59.2828943662, -36.9399639356), (-64.8151115693, -40.133991027))
            ThreePointArc((-64.8151115693, -40.133991027), (-62.198772999, -42.5341379235), (-58.7029173279, -43.1545617836))
        make_face()
        with BuildLine():
            Line((-67.1646115693, -36.0645376546), (-61.6323943662, -32.8705105632))
            ThreePointArc((-61.6323943662, -32.8705105632), (-63.2261799634, -29.6896053734), (-64.6559292996, -26.4316724103))
            Line((-64.6559292996, -26.4316724103), (-66.7244054577, -29.2609367904))
            ThreePointArc((-66.7244054577, -29.2609367904), (-67.9350304693, -32.5986485396), (-67.1646115693, -36.0645376546))
        make_face()
        with BuildLine():
            Line((-72.7082612299, 4.6751956613), (-69.796864039, 2.7240173131))
            ThreePointArc((-69.796864039, 2.7240173131), (-69.5676178372, 6.2744759504), (-69.1578829213, 9.8086558631))
            Line((-69.1578829213, 9.8086558631), (-75.4488882072, 10.9179298308))
            ThreePointArc((-75.4488882072, 10.9179298308), (-74.9874412706, 7.3975606223), (-72.7082612299, 4.6751956613))
        make_face()
        with BuildLine():
            ThreePointArc((-68.3419101345, 14.4362674945), (-67.5181742912, 17.8974478736), (-66.5192668833, 21.3121944743))
            Line((-66.5192668833, 21.3121944743), (-69.922427638, 20.4744430631))
            ThreePointArc((-69.922427638, 20.4744430631), (-72.9952599579, 18.6957822824), (-74.6329154204, 15.5455414622))
            Line((-74.6329154204, 15.5455414622), (-68.3419101345, 14.4362674945))
        make_face()
    extrude(amount=F1_DEPTH)

    # F2 (on face) → F3 (cut)
    with BuildSketch(Plane.XZ.offset(5.08)):
        Circle(F2_R)
        with BuildLine():
            ThreePointArc((1.3237188184, 46.9713515719), (33.2549291255, 33.1989425865), (46.9735153237, 1.2445714667))
            ThreePointArc((46.9735153237, 1.2445714667), (47.5939548576, 0.7548913882), (47.8282, 0))
            ThreePointArc((47.8282, 0), (47.5939548576, -0.7548913882), (46.9735153237, -1.2445714667))
            ThreePointArc((46.9735153237, -1.2445714667), (33.226947648, -33.226947648), (1.2445714667, -46.9735153237))
            ThreePointArc((1.2445714667, -46.9735153237), (0, -47.8282), (-1.2445714667, -46.9735153237))
            ThreePointArc((-1.2445714667, -46.9735153237), (-33.226947648, -33.226947648), (-46.9735153237, -1.2445714667))
            ThreePointArc((-46.9735153237, -1.2445714667), (-47.8282, 0), (-46.9735153237, 1.2445714667))
            ThreePointArc((-46.9735153237, 1.2445714667), (-33.2549291255, 33.1989425865), (-1.3237188184, 46.9713515719))
            ThreePointArc((-1.3237188184, 46.9713515719), (-0.9312725034, 48.9788228036), (0, 50.8))
            ThreePointArc((0, 50.8), (0.9312725034, 48.9788228036), (1.3237188184, 46.9713515719))
        make_face(mode=Mode.SUBTRACT)
    extrude(amount=-F3_DEPTH, mode=Mode.SUBTRACT)

    # F4 (on face) → F5 (join, through all)
    with BuildSketch(Plane.XZ.offset(5.08)):
        with BuildLine():
            ThreePointArc((0.0254, 51.0539936816), (0, 51.054), (-0.0254, 51.0539936816))
            Line((-0.0254, 51.0539936816), (-0.0254, 46.9899931351))
            ThreePointArc((-0.0254, 46.9899931351), (0, 46.99), (0.0254, 46.9899931351))
            Line((0.0254, 46.9899931351), (0.0254, 51.0539936816))
        make_face()
    f5 = extrude(amount=-F5_DEPTH)

    # F5_copies: F5 across plane
    add(f5.mirror(Plane(origin=(0, 0, 0), x_dir=(-1, 0, 0), z_dir=(0, 0, -1))))


solid = f1.part
